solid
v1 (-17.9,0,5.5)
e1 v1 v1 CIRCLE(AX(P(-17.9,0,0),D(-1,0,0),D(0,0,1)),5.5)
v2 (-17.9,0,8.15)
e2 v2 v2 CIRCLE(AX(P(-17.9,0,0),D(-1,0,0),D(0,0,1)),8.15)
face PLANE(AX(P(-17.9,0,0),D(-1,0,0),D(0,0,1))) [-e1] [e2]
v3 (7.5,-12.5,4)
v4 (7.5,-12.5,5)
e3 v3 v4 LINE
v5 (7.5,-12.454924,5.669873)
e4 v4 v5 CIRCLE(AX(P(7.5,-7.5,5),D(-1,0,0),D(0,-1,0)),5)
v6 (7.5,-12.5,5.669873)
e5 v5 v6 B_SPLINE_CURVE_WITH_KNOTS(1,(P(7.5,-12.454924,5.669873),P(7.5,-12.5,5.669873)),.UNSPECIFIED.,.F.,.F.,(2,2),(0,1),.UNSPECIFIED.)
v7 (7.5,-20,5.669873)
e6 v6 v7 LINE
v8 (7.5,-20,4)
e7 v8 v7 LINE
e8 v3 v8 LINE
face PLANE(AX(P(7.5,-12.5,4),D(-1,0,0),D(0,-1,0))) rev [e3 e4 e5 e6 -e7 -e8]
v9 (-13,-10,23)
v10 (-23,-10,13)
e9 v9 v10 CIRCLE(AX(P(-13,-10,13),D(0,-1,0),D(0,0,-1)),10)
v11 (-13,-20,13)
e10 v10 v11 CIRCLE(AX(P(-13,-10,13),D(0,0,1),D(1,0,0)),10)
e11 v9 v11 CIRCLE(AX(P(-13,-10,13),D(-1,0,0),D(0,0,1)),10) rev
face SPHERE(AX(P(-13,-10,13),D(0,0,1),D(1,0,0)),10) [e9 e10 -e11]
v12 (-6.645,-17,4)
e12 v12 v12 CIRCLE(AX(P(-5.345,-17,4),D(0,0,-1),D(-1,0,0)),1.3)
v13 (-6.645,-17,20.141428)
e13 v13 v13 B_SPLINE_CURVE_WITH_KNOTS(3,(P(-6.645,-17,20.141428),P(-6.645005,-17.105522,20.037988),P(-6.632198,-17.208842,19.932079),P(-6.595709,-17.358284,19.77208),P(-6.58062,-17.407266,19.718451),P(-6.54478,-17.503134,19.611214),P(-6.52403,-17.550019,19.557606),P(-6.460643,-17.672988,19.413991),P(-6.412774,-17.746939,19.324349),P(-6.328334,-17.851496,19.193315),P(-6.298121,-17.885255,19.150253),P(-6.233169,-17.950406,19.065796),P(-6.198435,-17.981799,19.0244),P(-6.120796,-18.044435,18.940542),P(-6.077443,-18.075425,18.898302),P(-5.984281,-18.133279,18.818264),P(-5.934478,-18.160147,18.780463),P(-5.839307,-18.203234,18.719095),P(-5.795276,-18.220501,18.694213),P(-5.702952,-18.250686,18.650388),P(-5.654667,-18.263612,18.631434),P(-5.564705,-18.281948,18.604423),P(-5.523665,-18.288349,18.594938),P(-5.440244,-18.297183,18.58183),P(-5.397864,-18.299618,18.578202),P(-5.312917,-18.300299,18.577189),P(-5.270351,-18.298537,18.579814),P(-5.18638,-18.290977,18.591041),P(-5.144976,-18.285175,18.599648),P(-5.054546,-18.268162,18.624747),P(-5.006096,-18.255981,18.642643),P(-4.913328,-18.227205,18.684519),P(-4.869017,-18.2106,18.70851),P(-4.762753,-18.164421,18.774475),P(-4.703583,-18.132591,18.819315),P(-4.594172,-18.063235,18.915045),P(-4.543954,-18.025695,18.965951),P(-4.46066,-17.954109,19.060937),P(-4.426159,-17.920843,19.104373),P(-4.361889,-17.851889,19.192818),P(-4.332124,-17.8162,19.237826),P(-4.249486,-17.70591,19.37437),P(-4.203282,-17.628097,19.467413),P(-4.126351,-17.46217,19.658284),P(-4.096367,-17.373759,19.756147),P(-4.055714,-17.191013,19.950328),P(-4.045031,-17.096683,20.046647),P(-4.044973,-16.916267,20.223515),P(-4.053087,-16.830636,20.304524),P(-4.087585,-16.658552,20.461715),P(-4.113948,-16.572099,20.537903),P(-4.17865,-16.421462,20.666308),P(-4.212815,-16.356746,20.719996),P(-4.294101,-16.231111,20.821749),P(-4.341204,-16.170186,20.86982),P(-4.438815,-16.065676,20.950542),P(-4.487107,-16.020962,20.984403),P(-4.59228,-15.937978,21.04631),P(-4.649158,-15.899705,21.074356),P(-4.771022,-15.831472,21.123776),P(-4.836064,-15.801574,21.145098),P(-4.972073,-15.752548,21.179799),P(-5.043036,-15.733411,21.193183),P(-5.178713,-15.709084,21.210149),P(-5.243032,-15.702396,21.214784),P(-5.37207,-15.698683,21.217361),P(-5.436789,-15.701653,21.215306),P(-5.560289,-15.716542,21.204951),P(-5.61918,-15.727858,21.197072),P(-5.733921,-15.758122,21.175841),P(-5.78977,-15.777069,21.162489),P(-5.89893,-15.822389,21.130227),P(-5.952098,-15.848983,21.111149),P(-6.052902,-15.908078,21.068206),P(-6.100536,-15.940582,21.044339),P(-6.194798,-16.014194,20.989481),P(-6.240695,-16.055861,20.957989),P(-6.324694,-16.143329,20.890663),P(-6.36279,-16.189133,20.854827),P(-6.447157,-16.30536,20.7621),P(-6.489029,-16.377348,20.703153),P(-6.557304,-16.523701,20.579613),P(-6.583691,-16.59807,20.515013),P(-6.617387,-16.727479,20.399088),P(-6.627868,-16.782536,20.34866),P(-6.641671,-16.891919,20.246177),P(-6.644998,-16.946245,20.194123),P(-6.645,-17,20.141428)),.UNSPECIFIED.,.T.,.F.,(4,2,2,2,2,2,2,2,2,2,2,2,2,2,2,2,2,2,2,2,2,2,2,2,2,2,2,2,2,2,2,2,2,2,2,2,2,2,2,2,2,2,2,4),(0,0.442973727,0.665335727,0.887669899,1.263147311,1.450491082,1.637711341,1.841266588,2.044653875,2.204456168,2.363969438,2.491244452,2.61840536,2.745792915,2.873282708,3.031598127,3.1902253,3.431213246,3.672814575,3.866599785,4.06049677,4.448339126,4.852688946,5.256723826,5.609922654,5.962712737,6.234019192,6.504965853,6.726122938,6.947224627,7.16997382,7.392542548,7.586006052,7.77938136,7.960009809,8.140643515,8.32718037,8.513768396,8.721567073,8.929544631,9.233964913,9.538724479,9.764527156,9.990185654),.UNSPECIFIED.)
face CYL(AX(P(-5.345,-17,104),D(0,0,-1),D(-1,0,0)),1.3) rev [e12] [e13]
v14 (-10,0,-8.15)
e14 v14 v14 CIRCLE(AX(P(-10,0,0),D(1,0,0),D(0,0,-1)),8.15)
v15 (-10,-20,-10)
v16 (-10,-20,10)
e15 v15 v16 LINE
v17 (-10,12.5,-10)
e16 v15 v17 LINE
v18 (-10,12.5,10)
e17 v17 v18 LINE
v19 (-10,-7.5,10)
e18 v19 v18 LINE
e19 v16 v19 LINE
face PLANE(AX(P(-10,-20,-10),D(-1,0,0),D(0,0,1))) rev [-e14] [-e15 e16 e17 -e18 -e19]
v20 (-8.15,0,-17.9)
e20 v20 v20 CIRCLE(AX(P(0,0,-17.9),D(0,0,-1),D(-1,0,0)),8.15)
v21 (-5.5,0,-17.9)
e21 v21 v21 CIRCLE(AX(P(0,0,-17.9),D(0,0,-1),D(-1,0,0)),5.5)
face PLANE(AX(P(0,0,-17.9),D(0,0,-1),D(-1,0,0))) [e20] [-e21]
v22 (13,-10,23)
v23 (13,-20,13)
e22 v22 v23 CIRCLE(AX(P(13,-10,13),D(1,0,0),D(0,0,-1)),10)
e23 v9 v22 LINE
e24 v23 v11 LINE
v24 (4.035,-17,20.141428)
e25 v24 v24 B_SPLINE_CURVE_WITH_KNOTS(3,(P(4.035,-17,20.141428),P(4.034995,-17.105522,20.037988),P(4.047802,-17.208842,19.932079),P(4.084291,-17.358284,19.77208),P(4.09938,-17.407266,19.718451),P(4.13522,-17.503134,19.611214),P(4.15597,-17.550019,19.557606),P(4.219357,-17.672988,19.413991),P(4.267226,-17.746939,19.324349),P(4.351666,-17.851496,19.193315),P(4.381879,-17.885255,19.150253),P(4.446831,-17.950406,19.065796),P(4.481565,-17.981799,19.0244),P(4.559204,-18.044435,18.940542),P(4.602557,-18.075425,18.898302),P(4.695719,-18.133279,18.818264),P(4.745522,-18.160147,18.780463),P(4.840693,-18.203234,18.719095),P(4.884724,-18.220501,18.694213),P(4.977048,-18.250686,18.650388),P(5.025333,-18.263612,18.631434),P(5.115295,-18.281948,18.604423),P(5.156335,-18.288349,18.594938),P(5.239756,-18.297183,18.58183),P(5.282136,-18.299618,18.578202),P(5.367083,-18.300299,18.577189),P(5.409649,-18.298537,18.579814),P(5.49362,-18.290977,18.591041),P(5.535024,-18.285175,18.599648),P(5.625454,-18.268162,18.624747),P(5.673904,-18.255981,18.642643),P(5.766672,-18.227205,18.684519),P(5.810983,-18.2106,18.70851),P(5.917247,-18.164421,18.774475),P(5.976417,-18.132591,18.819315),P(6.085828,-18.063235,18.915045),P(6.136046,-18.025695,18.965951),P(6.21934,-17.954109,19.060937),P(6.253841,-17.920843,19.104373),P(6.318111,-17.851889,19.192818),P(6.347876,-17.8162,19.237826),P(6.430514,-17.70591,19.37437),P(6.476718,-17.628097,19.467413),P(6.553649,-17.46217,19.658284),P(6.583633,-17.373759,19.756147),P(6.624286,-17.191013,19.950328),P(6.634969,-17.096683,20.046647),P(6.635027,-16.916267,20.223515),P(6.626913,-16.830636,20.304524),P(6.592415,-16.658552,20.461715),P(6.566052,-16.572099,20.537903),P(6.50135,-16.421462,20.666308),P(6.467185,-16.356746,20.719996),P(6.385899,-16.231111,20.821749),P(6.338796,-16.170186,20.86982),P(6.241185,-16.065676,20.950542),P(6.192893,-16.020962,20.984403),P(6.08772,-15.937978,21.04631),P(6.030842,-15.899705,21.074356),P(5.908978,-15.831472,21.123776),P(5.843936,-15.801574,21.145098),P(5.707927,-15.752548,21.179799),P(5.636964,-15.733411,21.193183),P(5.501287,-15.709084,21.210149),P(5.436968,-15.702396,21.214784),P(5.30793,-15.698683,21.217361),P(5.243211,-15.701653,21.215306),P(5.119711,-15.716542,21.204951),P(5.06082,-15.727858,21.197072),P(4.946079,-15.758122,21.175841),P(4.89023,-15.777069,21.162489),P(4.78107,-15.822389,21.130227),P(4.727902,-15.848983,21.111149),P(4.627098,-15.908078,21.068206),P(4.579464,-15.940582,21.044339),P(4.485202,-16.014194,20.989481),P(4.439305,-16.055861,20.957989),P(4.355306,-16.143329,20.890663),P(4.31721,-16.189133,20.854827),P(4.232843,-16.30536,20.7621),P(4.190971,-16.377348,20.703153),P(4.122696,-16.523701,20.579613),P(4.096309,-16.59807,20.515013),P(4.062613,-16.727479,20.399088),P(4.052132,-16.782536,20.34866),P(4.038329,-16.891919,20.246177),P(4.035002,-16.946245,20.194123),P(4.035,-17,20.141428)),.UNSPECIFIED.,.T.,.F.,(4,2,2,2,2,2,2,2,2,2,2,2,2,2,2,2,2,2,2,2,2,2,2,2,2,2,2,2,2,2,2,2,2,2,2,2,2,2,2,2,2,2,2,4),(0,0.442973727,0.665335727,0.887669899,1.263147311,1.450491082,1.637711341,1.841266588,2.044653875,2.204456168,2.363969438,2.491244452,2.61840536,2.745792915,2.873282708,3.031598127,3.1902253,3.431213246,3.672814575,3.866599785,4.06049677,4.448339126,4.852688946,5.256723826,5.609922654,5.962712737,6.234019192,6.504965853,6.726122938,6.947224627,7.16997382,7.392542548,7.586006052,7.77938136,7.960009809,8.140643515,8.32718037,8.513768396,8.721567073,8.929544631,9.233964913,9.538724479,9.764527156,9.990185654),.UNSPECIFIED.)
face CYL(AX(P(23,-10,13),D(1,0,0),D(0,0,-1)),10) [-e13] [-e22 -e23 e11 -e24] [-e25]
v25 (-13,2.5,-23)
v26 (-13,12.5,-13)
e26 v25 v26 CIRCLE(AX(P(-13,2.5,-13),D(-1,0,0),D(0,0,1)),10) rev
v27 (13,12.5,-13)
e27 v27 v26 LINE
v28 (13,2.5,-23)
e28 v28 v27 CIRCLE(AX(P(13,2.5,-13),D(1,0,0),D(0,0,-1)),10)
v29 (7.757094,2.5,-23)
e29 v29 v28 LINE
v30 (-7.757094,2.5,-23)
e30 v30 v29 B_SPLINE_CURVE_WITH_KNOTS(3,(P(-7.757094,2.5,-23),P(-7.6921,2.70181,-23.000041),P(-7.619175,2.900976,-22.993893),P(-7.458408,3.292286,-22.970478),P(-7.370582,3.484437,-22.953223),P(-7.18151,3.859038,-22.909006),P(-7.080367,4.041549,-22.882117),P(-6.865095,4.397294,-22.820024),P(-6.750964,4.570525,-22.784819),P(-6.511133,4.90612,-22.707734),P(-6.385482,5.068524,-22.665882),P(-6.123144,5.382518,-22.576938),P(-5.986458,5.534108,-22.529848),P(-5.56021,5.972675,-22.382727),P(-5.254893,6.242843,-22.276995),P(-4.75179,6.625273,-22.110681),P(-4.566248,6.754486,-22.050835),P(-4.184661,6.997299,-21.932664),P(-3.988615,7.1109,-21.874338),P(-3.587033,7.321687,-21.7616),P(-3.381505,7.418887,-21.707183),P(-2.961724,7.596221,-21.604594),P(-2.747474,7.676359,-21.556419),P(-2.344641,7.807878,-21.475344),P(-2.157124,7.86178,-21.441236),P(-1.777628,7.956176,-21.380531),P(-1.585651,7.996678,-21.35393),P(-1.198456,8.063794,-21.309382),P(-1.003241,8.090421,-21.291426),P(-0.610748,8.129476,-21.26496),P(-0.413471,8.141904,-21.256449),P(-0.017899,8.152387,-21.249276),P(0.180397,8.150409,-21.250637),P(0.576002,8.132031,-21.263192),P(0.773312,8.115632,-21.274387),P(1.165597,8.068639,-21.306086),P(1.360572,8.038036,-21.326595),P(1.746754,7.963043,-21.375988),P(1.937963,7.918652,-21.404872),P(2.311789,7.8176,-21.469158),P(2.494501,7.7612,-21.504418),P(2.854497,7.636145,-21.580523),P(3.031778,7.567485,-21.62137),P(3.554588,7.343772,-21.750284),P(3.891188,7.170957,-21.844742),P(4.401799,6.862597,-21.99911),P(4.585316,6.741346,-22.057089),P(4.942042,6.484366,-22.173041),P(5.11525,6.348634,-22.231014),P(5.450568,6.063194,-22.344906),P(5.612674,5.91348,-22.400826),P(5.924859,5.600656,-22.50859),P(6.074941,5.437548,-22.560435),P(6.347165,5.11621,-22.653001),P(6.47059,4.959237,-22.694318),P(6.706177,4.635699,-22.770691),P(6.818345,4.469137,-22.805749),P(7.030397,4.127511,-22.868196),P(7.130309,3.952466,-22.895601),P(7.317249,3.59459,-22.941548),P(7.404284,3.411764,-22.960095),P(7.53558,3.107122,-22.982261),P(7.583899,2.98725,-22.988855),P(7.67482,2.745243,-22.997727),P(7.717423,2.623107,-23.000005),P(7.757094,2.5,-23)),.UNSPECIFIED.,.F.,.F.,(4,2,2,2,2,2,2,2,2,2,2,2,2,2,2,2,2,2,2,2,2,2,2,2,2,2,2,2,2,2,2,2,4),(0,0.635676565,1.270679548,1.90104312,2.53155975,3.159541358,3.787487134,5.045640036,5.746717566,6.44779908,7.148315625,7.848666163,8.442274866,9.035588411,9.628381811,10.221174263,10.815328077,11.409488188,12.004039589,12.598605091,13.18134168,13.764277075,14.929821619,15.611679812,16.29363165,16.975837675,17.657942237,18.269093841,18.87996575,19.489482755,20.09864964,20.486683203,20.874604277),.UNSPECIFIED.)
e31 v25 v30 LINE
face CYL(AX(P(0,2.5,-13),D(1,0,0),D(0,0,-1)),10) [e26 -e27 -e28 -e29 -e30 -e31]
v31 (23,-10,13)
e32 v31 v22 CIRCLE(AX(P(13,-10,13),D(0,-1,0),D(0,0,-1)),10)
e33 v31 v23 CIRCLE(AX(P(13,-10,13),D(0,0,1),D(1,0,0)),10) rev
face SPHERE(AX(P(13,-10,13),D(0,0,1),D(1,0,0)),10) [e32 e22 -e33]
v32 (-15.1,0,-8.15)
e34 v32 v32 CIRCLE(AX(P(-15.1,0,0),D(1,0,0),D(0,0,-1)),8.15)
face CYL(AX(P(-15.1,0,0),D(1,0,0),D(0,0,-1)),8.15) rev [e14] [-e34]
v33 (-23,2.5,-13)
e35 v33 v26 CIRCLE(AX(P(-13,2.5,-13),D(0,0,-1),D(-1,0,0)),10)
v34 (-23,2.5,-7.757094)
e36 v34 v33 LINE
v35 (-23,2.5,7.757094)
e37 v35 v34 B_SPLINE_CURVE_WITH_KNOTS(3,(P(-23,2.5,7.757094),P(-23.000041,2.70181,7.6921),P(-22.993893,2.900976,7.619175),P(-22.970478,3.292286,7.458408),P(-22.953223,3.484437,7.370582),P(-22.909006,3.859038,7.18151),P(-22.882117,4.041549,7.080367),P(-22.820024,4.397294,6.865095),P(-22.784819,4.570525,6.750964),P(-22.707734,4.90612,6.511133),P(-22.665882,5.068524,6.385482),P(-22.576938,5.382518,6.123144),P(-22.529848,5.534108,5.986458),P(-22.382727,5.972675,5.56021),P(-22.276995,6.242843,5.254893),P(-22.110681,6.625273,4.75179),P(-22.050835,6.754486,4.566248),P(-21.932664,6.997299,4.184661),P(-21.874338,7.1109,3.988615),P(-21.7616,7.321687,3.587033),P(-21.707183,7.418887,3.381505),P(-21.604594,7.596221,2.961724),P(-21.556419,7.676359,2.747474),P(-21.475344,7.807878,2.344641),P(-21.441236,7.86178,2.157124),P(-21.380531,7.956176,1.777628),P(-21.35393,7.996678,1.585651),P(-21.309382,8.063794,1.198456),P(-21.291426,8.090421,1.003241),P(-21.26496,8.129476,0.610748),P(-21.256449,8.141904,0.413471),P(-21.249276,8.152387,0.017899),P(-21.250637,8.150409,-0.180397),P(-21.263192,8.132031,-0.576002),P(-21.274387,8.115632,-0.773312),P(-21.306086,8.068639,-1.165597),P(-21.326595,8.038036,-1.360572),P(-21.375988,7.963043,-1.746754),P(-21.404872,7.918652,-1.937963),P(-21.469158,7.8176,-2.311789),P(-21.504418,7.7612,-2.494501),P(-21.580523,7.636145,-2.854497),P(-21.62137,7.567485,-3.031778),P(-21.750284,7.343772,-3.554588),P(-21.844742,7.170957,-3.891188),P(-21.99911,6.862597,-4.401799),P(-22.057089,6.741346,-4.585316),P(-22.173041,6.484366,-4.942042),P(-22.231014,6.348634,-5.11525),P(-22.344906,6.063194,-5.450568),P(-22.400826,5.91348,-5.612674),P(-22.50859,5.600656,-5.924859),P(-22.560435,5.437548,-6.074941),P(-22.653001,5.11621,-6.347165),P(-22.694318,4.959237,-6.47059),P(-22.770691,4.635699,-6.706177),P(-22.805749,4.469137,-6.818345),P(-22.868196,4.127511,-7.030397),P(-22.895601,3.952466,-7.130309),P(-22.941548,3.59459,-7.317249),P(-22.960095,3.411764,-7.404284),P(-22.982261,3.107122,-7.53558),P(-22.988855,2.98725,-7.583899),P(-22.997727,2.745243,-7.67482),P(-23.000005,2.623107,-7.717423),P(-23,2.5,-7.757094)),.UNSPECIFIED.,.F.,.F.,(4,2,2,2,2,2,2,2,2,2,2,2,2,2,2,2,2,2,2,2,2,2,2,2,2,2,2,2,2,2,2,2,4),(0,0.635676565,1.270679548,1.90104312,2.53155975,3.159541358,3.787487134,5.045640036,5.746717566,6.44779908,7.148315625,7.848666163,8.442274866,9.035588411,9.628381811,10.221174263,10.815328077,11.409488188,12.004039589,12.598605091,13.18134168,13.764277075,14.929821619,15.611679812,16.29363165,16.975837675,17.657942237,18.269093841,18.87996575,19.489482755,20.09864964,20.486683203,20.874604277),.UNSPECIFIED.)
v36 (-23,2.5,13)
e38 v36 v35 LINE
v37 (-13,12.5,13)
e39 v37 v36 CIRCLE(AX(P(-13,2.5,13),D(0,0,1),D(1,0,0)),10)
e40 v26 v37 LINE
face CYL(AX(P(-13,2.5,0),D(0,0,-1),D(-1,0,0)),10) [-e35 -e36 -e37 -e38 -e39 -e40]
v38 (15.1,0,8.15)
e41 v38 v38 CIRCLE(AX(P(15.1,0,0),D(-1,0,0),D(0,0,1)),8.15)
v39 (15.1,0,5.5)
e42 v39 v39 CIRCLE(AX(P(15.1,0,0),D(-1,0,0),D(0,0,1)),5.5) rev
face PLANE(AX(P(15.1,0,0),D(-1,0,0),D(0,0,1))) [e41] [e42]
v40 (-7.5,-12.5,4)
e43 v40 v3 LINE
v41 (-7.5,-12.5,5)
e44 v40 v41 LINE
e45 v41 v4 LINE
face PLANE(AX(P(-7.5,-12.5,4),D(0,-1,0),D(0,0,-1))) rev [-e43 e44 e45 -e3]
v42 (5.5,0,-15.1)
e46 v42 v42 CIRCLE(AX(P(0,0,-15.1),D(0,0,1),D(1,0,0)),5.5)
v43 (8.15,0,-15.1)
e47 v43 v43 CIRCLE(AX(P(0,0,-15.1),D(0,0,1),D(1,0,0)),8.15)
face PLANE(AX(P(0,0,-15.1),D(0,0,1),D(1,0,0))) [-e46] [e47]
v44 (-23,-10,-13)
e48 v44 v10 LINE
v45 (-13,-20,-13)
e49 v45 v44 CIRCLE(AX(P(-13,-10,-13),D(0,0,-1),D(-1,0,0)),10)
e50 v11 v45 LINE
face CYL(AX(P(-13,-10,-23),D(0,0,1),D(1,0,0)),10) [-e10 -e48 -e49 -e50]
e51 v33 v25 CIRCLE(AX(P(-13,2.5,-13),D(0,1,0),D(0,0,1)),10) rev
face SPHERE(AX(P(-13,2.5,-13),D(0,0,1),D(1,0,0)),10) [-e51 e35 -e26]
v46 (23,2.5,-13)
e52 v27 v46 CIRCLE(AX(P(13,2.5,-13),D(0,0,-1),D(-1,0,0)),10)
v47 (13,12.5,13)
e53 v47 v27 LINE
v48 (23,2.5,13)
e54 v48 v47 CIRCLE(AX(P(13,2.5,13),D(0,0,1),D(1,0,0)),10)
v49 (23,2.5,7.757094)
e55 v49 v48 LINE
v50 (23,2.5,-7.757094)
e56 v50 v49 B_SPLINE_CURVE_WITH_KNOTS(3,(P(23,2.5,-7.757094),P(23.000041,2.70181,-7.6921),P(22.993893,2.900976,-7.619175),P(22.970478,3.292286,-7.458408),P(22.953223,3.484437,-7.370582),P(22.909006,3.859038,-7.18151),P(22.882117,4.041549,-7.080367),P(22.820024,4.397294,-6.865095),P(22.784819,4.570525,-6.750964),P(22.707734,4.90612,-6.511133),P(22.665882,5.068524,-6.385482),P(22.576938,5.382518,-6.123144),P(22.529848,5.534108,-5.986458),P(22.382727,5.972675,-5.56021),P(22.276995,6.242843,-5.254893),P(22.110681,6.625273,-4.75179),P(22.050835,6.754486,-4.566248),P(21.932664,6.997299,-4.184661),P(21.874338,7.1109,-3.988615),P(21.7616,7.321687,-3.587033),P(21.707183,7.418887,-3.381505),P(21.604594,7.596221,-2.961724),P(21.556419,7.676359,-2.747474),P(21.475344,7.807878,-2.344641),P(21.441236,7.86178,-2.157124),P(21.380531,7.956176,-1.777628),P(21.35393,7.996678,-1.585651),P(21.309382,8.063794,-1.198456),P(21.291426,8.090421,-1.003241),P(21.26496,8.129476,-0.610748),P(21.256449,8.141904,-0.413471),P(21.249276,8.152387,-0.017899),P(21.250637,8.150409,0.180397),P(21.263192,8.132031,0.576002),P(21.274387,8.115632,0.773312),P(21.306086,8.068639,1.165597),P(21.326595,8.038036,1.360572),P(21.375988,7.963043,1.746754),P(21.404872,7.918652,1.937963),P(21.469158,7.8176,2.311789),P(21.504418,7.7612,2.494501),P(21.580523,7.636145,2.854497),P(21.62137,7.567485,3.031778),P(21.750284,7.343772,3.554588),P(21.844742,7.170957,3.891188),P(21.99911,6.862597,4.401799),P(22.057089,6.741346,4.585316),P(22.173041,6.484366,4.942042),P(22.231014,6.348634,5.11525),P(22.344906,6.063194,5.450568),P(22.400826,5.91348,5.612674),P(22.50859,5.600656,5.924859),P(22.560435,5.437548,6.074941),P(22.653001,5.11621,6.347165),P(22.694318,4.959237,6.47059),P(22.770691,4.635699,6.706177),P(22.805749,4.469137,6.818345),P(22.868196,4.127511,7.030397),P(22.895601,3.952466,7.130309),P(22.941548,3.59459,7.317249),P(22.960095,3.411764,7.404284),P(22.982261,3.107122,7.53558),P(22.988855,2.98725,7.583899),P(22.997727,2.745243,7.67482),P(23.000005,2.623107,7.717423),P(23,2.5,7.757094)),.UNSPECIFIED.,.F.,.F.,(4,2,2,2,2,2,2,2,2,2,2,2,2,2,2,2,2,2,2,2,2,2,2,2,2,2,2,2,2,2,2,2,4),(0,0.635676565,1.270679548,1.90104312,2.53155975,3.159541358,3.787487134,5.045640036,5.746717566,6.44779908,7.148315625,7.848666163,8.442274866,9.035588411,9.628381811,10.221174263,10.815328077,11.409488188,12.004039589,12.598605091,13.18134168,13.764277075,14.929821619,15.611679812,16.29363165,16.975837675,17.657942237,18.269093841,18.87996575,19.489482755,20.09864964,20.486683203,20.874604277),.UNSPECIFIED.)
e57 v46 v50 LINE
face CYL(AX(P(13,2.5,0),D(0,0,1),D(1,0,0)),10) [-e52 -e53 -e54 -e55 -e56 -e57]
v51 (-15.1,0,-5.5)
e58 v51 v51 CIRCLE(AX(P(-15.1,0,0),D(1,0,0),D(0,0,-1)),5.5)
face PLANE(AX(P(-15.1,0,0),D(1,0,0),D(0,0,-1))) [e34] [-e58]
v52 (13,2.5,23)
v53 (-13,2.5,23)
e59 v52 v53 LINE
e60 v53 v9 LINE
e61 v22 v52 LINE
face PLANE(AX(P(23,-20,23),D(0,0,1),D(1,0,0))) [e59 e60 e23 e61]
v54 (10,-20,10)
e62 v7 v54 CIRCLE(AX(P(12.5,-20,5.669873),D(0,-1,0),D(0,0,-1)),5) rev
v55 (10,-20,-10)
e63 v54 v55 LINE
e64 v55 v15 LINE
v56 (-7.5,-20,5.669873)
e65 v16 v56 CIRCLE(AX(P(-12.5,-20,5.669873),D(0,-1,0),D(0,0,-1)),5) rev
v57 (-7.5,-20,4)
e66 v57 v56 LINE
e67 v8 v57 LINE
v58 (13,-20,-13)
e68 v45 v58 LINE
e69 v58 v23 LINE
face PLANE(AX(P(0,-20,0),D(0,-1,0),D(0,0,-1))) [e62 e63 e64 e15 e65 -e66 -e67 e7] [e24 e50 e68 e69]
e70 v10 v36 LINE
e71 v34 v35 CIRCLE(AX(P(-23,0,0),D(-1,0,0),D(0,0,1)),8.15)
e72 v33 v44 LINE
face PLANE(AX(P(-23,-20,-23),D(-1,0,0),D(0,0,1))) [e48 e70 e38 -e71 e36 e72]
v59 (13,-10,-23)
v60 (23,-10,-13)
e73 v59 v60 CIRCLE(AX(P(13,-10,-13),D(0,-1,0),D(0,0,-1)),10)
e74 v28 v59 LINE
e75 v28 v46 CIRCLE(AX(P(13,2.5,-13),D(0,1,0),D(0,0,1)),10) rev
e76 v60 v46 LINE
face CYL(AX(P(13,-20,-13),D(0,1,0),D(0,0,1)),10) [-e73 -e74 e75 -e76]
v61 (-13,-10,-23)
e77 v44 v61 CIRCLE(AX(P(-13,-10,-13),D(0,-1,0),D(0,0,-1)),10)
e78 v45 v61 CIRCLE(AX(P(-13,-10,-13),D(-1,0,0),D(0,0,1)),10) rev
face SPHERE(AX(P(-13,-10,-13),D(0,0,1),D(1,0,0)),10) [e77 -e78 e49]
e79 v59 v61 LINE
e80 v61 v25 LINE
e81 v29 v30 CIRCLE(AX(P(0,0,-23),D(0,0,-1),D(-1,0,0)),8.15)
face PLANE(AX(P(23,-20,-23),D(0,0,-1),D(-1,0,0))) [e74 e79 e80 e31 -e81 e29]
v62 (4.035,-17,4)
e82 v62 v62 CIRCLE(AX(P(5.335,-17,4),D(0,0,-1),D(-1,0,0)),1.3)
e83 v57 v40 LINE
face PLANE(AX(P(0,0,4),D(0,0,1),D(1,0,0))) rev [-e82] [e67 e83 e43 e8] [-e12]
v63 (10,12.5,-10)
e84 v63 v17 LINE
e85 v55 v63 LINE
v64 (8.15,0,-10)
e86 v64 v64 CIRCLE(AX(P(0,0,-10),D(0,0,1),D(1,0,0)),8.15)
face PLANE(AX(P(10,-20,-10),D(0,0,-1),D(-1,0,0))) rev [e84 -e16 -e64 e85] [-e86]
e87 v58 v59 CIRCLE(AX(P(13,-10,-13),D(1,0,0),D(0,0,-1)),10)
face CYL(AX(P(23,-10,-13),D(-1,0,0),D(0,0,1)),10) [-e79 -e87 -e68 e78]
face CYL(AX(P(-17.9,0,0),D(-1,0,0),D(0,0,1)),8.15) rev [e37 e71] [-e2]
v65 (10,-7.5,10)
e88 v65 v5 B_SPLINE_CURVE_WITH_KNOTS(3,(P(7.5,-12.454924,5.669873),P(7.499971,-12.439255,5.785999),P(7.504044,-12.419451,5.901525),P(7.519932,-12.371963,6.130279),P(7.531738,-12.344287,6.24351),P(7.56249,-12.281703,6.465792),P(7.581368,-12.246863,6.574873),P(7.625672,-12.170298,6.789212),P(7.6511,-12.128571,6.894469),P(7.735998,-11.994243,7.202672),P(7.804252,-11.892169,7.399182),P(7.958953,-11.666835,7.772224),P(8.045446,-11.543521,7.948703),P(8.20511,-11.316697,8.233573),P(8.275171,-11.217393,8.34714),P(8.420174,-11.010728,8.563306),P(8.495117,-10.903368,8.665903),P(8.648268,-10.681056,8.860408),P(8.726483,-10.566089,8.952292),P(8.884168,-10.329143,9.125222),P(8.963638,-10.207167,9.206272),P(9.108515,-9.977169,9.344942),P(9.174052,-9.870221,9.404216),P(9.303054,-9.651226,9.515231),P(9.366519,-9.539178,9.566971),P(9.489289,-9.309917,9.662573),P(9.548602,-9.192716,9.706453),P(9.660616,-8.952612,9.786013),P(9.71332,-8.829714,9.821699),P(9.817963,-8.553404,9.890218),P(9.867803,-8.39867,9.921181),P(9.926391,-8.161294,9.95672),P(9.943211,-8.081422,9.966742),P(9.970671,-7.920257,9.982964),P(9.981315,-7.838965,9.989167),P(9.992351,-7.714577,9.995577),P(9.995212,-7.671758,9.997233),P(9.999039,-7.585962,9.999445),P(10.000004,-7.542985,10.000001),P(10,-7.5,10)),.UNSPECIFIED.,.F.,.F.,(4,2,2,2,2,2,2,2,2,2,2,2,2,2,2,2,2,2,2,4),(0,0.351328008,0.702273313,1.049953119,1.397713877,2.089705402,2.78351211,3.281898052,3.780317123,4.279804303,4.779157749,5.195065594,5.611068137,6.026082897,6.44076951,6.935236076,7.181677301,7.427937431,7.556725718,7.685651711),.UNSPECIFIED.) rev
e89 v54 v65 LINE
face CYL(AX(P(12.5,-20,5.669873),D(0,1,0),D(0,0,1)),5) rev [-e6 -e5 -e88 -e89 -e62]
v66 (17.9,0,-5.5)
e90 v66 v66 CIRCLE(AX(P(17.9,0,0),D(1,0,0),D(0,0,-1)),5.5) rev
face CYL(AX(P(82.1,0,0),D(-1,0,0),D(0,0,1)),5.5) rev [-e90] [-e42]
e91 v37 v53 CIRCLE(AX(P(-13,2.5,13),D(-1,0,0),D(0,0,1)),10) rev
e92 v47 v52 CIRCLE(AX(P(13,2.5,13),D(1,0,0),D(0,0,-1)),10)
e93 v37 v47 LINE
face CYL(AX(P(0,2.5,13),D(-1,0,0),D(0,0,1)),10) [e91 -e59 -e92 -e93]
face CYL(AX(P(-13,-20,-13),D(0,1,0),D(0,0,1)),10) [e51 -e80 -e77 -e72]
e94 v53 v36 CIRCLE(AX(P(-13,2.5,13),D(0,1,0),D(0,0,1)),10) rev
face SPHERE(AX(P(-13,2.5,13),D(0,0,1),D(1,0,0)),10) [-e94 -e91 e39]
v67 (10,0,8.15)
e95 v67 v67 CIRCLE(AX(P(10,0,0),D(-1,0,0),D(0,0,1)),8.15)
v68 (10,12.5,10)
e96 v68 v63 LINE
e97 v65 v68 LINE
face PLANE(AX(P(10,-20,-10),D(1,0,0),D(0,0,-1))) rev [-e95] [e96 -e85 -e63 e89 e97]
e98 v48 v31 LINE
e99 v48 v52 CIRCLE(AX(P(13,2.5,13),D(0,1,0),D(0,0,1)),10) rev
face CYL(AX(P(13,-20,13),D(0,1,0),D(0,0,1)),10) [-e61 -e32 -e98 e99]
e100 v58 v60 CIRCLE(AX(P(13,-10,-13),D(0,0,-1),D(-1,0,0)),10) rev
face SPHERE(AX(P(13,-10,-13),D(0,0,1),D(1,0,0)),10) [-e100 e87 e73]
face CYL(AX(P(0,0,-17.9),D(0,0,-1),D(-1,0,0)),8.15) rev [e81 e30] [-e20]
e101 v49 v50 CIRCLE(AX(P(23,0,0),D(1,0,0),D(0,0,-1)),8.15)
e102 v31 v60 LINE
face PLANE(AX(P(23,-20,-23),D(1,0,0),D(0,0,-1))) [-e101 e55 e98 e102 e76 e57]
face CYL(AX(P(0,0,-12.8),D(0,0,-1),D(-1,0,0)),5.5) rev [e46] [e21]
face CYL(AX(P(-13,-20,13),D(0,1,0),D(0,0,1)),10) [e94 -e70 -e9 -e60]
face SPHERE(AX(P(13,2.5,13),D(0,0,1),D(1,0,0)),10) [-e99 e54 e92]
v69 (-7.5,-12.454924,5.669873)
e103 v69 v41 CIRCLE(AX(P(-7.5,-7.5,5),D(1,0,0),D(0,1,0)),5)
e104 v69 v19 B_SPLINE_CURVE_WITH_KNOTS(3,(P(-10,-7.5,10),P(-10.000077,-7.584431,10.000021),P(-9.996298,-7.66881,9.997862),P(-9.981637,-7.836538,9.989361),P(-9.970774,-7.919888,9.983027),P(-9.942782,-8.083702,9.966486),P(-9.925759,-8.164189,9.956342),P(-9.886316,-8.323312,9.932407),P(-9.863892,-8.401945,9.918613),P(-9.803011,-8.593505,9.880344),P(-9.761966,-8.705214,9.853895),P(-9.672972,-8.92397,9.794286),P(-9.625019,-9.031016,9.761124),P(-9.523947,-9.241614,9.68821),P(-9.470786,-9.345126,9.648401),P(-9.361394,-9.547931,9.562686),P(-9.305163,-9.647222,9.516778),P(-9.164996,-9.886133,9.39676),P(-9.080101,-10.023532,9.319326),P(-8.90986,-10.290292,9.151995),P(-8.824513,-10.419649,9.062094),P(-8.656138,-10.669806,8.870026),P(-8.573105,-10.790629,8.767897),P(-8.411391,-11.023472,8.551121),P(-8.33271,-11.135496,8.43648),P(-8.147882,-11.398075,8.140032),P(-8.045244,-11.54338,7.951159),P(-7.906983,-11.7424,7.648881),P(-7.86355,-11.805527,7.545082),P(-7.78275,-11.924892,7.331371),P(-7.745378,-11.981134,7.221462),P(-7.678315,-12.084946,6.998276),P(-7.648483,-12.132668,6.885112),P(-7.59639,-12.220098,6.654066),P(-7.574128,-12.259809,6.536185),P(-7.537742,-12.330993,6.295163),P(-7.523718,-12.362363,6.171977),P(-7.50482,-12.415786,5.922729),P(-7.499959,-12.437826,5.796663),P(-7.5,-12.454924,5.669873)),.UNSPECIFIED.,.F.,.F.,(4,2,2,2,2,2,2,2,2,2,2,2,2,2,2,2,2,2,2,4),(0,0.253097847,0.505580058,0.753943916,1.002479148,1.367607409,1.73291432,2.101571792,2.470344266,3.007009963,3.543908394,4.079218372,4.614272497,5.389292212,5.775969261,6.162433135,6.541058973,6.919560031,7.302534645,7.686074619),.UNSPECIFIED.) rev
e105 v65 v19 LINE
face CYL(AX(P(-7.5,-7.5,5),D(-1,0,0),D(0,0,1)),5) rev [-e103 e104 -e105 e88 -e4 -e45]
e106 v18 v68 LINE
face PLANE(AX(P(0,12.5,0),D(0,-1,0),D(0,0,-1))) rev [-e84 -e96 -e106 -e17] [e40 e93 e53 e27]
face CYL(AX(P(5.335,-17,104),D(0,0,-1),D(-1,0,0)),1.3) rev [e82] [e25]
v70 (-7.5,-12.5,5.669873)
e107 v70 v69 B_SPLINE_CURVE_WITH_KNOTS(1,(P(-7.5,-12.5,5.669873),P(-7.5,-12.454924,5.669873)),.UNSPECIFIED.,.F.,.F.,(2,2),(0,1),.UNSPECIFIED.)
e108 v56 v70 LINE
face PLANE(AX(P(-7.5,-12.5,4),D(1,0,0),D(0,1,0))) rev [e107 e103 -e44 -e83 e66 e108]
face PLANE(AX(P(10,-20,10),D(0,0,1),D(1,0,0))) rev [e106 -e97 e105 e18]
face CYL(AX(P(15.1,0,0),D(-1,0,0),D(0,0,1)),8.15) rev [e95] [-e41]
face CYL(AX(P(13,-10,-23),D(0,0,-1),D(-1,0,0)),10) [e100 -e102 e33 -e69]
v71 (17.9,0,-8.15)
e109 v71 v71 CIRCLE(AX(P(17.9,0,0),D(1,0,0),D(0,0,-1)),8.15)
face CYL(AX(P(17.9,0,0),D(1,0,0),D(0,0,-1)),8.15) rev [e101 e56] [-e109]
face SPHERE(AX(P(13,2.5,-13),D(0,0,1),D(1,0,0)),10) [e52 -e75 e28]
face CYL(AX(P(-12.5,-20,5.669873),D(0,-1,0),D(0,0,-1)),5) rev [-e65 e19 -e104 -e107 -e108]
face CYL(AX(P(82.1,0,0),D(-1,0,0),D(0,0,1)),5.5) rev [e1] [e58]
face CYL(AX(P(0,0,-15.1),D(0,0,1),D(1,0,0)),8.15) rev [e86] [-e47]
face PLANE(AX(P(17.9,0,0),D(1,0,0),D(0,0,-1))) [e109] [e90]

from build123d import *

# Parameters (mm, degrees)
BOSS_EXTRUDE1_DEPTH      = 12.5
BOSS_EXTRUDE1_DEPTH_BACK = 20
SKETCH2_R                = 8.15
CUT_EXTRUDE1_DEPTH       = 5.1
CUT_EXTRUDE2_START       = -5.1
SKETCH3_R                = 8.15
CUT_EXTRUDE2_DEPTH       = 5.1
SKETCH4_R                = 5.5
CUT_EXTRUDE3_DEPTH       = 100
SKETCH5_R                = 8.150000000000011
CUT_EXTRUDE4_DEPTH       = 5.1
CUT_EXTRUDE5_START       = -5.1
SKETCH6_R                = 8.150000000000006
CUT_EXTRUDE5_DEPTH       = 5.1
SKETCH7_R                = 8.15
CUT_EXTRUDE6_DEPTH       = 5.1
CUT_EXTRUDE7_START       = -5.1
SKETCH8_R                = 8.150000000000004
CUT_EXTRUDE7_DEPTH       = 5.1
SKETCH9_R                = 5.5
CUT_EXTRUDE8_DEPTH       = 5.1
FILLET1_R                = 10
BOSS_EXTRUDE2_DEPTH      = 6
SKETCH10_R               = 1.2999999999999996
CUT_EXTRUDE9_DEPTH       = 100
FILLET2_R                = 5


with BuildPart() as part:
    # Sketch1 → Boss-Extrude1 (new, two sides: drawn at the far end of the back side and taken through both)
    with BuildSketch(Plane(origin=(0, 0, 0), x_dir=(1, 0, 0), z_dir=(0, 1, 0)).offset(-BOSS_EXTRUDE1_DEPTH_BACK)):
        Polygon((22.999999999999993, 23), (-22.999999999999993, 22.999999999999993), (-22.999999999999993, -23.000000000000007), (23.000000000000007, -23), align=None)
        Polygon((10, 9.999999999999998), (-10, 9.999999999999996), (-10, -10.000000000000004), (10.000000000000002, -10.000000000000002), align=None, mode=Mode.SUBTRACT)
    extrude(amount=BOSS_EXTRUDE1_DEPTH + BOSS_EXTRUDE1_DEPTH_BACK)

    # Sketch2 → Cut-Extrude1 (cut)
    with BuildSketch(Plane.ZY.offset(22.999999999999993)):
        Circle(SKETCH2_R)
    extrude(amount=-CUT_EXTRUDE1_DEPTH, mode=Mode.SUBTRACT)

    # Sketch3 → Cut-Extrude2 (cut)
    with BuildSketch(Plane(origin=(-10, 0, 0), x_dir=(0, 0, -1), z_dir=(1, 0, 0)).offset(CUT_EXTRUDE2_START)):
        with Locations(Location((1.73e-15, 0, 0), (0, 0, 180))):
            Circle(SKETCH3_R)
    extrude(amount=CUT_EXTRUDE2_DEPTH, mode=Mode.SUBTRACT)

    # Sketch4 → Cut-Extrude3 (cut)
    with BuildSketch(Plane.ZY.offset(17.89999999999999)):
        Circle(SKETCH4_R)
    extrude(amount=-CUT_EXTRUDE3_DEPTH, mode=Mode.SUBTRACT)

    # Sketch5 → Cut-Extrude4 (cut)
    with BuildSketch(Plane.ZY.offset(-10)):
        Circle(SKETCH5_R)
    extrude(amount=-CUT_EXTRUDE4_DEPTH, mode=Mode.SUBTRACT)

    # Sketch6 → Cut-Extrude5 (cut)
    with BuildSketch(Plane(origin=(23, 0, -6.94e-15), x_dir=(-3e-16, 0, -1), z_dir=(1, 0, -3e-16)).offset(CUT_EXTRUDE5_START)):
        with Locations(Location((0, 0, 0), (0, 0, 180))):
            Circle(SKETCH6_R)
    extrude(amount=CUT_EXTRUDE5_DEPTH, mode=Mode.SUBTRACT)

    # Sketch7 → Cut-Extrude6 (cut)
    with BuildSketch(Plane(origin=(-3.47e-15, 0, -22.999999999999996), x_dir=(-1, 0, 1.5e-16), z_dir=(-1.5e-16, 0, -1))):
        Circle(SKETCH7_R)
    extrude(amount=-CUT_EXTRUDE6_DEPTH, mode=Mode.SUBTRACT)

    # Sketch8 → Cut-Extrude7 (cut)
    with BuildSketch(Plane.XY.offset(-9.999999999999998).offset(CUT_EXTRUDE7_START)):
        with Locations(Location((8.7e-16, 0, 0), (0, 0, 180))):
            Circle(SKETCH8_R)
    extrude(amount=CUT_EXTRUDE7_DEPTH, mode=Mode.SUBTRACT)

    # Sketch9 → Cut-Extrude8 (cut)
    with BuildSketch(Plane(origin=(-2.7e-15, 0, -17.899999999999995), x_dir=(-1, 0, 1.5e-16), z_dir=(-1.5e-16, 0, -1))):
        Circle(SKETCH9_R)
    extrude(amount=-CUT_EXTRUDE8_DEPTH, mode=Mode.SUBTRACT)

    # Fillet1
    # the kernel refuses this fillet: 10 mm, written as the material it takes off along each edge
    with BuildSketch(Plane(origin=(13.000000000000004, -10, 13.000000000000002), x_dir=(0, -1, 0), z_dir=(1, 0, -3.1e-16))) as fillet1_piece_1_section:
        Polygon((0, 0), (FILLET1_R, 0), (FILLET1_R, -FILLET1_R), (0, -FILLET1_R), align=None)
    fillet1_piece_1 = extrude(amount=FILLET1_R, mode=Mode.PRIVATE)
    fillet1_piece_1 = fillet1_piece_1 - Plane(origin=(13.000000000000004, -10, 13.000000000000002), x_dir=(0, 0.7071067811865475, -0.7071067811865475), z_dir=(1, 0, -3.1e-16)) * Sphere(FILLET1_R, mode=Mode.PRIVATE)
    add(fillet1_piece_1, mode=Mode.SUBTRACT)
    with BuildSketch(Plane(origin=(12.999999999999996, -10, -13), x_dir=(1, 0, -3.1e-16), z_dir=(-1.5e-16, 0, -1))) as fillet1_piece_2_section:
        Polygon((0, 0), (FILLET1_R, 0), (FILLET1_R, FILLET1_R), (0, FILLET1_R), align=None)
    fillet1_piece_2 = extrude(amount=FILLET1_R, mode=Mode.PRIVATE)
    fillet1_piece_2 = fillet1_piece_2 - Plane(origin=(12.999999999999996, -10, -13), x_dir=(-0.7071067811865475, 0.7071067811865475, 0), z_dir=(-1.5e-16, 0, -1)) * Sphere(FILLET1_R, mode=Mode.PRIVATE)
    add(fillet1_piece_2, mode=Mode.SUBTRACT)
    with BuildSketch(Plane(origin=(-12.999999999999991, -10, -12.999999999999993), x_dir=(0, -1, 0), z_dir=(-1.5e-16, 0, -1))) as fillet1_piece_3_section:
        Polygon((0, 0), (FILLET1_R, 0), (FILLET1_R, FILLET1_R), (0, FILLET1_R), align=None)
    fillet1_piece_3 = extrude(amount=FILLET1_R, mode=Mode.PRIVATE)
    fillet1_piece_3 = fillet1_piece_3 - Plane(origin=(-12.999999999999991, -10, -12.999999999999993), x_dir=(0.7071067811865475, 0.7071067811865475, 0), z_dir=(-1.5e-16, 0, -1)) * Sphere(FILLET1_R, mode=Mode.PRIVATE)
    add(fillet1_piece_3, mode=Mode.SUBTRACT)
    with BuildSketch(Plane(origin=(-12.999999999999991, 2.5, -12.999999999999993), x_dir=(0, 1, 0), z_dir=(-1.5e-16, 0, -1))) as fillet1_piece_4_section:
        Polygon((0, 0), (FILLET1_R, 0), (FILLET1_R, -FILLET1_R), (0, -FILLET1_R), align=None)
    fillet1_piece_4 = extrude(amount=FILLET1_R, mode=Mode.PRIVATE)
    fillet1_piece_4 = fillet1_piece_4 - Plane(origin=(-12.999999999999991, 2.5, -12.999999999999993), x_dir=(0.7071067811865475, -0.7071067811865475, 0), z_dir=(-1.5e-16, 0, -1)) * Sphere(FILLET1_R, mode=Mode.PRIVATE)
    add(fillet1_piece_4, mode=Mode.SUBTRACT)
    with BuildSketch(Plane(origin=(-12.999999999999993, 2.5, 13.000000000000005), x_dir=(-1, 0, 0), z_dir=(0, 1, 0))) as fillet1_piece_5_section:
        Polygon((0, 0), (FILLET1_R, 0), (FILLET1_R, FILLET1_R), (-1.54e-15, FILLET1_R), align=None)
    fillet1_piece_5 = extrude(amount=FILLET1_R, mode=Mode.PRIVATE)
    fillet1_piece_5 = fillet1_piece_5 - Plane(origin=(-12.999999999999993, 2.5, 13.000000000000005), x_dir=(0.7071067811865475, 0, -0.7071067811865476), z_dir=(0, 1, 0)) * Sphere(FILLET1_R, mode=Mode.PRIVATE)
    add(fillet1_piece_5, mode=Mode.SUBTRACT)
    with BuildSketch(Plane(origin=(13.000000000000004, 2.5, 13.000000000000002), x_dir=(0, 1, 0), z_dir=(1, 0, -3.1e-16))) as fillet1_piece_6_section:
        Polygon((0, 0), (FILLET1_R, 0), (FILLET1_R, FILLET1_R), (0, FILLET1_R), align=None)
    fillet1_piece_6 = extrude(amount=FILLET1_R, mode=Mode.PRIVATE)
    fillet1_piece_6 = fillet1_piece_6 - Plane(origin=(13.000000000000004, 2.5, 13.000000000000002), x_dir=(0, -0.7071067811865475, -0.7071067811865475), z_dir=(1, 0, -3.1e-16)) * Sphere(FILLET1_R, mode=Mode.PRIVATE)
    add(fillet1_piece_6, mode=Mode.SUBTRACT)
    with BuildSketch(Plane(origin=(12.999999999999996, 2.5, -13), x_dir=(1, 0, -3.1e-16), z_dir=(-1.5e-16, 0, -1))) as fillet1_piece_7_section:
        Polygon((0, 0), (FILLET1_R, 0), (FILLET1_R, -FILLET1_R), (0, -FILLET1_R), align=None)
    fillet1_piece_7 = extrude(amount=FILLET1_R, mode=Mode.PRIVATE)
    fillet1_piece_7 = fillet1_piece_7 - Plane(origin=(12.999999999999996, 2.5, -13), x_dir=(-0.7071067811865475, -0.7071067811865475, 0), z_dir=(-1.5e-16, 0, -1)) * Sphere(FILLET1_R, mode=Mode.PRIVATE)
    add(fillet1_piece_7, mode=Mode.SUBTRACT)
    with BuildSketch(Plane(origin=(-12.999999999999993, -10, 13.000000000000005), x_dir=(-1, 0, 0), z_dir=(0, -1, 0))) as fillet1_piece_8_section:
        Polygon((0, 0), (FILLET1_R, 0), (FILLET1_R, -FILLET1_R), (-1.54e-15, -FILLET1_R), align=None)
    fillet1_piece_8 = extrude(amount=FILLET1_R, mode=Mode.PRIVATE)
    fillet1_piece_8 = fillet1_piece_8 - Plane(origin=(-12.999999999999993, -10, 13.000000000000005), x_dir=(0.7071067811865475, 0, -0.7071067811865476), z_dir=(0, -1, 0)) * Sphere(FILLET1_R, mode=Mode.PRIVATE)
    add(fillet1_piece_8, mode=Mode.SUBTRACT)
    with BuildSketch(Plane(origin=(23.000000000000004, -20, 12.999999999999998), x_dir=(0, 1, 0), z_dir=(-3.1e-16, 0, -1))) as fillet1_piece_9:
        with BuildLine():
            CenterArc((FILLET1_R, -FILLET1_R), FILLET1_R, 90, 90)
            Line((0, -FILLET1_R), (0, 0))
            Line((0, 0), (FILLET1_R, 0))
        make_face()
    extrude(amount=26.000000000000007, mode=Mode.SUBTRACT)
    with BuildSketch(Plane(origin=(12.999999999999996, -20, -23), x_dir=(0, 1, 0), z_dir=(-1, 0, 1.5e-16))) as fillet1_piece_10:
        with BuildLine():
            CenterArc((FILLET1_R, -FILLET1_R), FILLET1_R, 90, 90)
            Line((0, -FILLET1_R), (0, 0))
            Line((0, 0), (FILLET1_R, 0))
        make_face()
    extrude(amount=25.99999999999999, mode=Mode.SUBTRACT)
    with BuildSketch(Plane(origin=(-22.999999999999993, 12.5, -12.999999999999993), x_dir=(1, 0, 0), z_dir=(0, 0, 1)), Plane(origin=(-12.999999999999993, 12.5, 23.000000000000007), x_dir=(-1.5e-16, 0, -1), z_dir=(1, 0, -1.5e-16))) as fillet1_piece_11:
        with BuildLine():
            CenterArc((FILLET1_R, -FILLET1_R), FILLET1_R, 90, 90)
            Line((0, -FILLET1_R), (0, 0))
            Line((0, 0), (FILLET1_R, 0))
        make_face()
    extrude(amount=26, mode=Mode.SUBTRACT)
    with BuildSketch(Plane(origin=(23.000000000000004, 12.5, 12.999999999999998), x_dir=(0, -1, 0), z_dir=(-3.1e-16, 0, -1))) as fillet1_piece_12:
        with BuildLine():
            CenterArc((FILLET1_R, FILLET1_R), FILLET1_R, 180, 90)
            Line((-1.78e-15, FILLET1_R), (0, 0))
            Line((0, 0), (FILLET1_R, 0))
        make_face()
    extrude(amount=26.000000000000007, mode=Mode.SUBTRACT)
    with BuildSketch(Plane(origin=(12.999999999999996, 12.5, -23), x_dir=(0, -1, 0), z_dir=(-1, 0, 1.5e-16))) as fillet1_piece_13:
        with BuildLine():
            CenterArc((FILLET1_R, FILLET1_R), FILLET1_R, 180, 90)
            Line((-1.78e-15, FILLET1_R), (0, 0))
            Line((0, 0), (FILLET1_R, 0))
        make_face()
    extrude(amount=25.99999999999999, mode=Mode.SUBTRACT)
    with BuildSketch(Plane(origin=(-22.999999999999993, -20, -12.999999999999993), x_dir=(1, 0, 0), z_dir=(0, 0, 1)), Plane(origin=(-12.999999999999993, -20, 23.000000000000007), x_dir=(-1.5e-16, 0, -1), z_dir=(1, 0, -1.5e-16))) as fillet1_piece_14:
        with BuildLine():
            CenterArc((FILLET1_R, FILLET1_R), FILLET1_R, 180, 90)
            Line((0, FILLET1_R), (0, 0))
            Line((0, 0), (FILLET1_R, 0))
        make_face()
    extrude(amount=26, mode=Mode.SUBTRACT)
    with BuildSketch(Plane(origin=(-22.999999999999993, -10, -22.999999999999993), x_dir=(1, 0, 0), z_dir=(0, 1, 0))) as fillet1_piece_15:
        with BuildLine():
            CenterArc((FILLET1_R, -FILLET1_R), FILLET1_R, 90.00000000000001, 89.99999999999999)
            Line((0, -FILLET1_R), (0, 0))
            Line((0, 0), (FILLET1_R, 0))
        make_face()
    extrude(amount=12.5, mode=Mode.SUBTRACT)
    with BuildSketch(Plane(origin=(22.999999999999993, 2.5, -23), x_dir=(-1, 0, 0), z_dir=(0, -1, 0))) as fillet1_piece_16:
        with BuildLine():
            CenterArc((FILLET1_R, -FILLET1_R), FILLET1_R, 89.99999999999999, 90.00000000000001)
            Line((-3.55e-15, -FILLET1_R), (0, 0))
            Line((0, 0), (FILLET1_R, 0))
        make_face()
    extrude(amount=12.5, mode=Mode.SUBTRACT)
    with BuildSketch(Plane(origin=(23.000000000000007, 2.5, 23), x_dir=(-3.6e-16, 0, -1), z_dir=(0, -1, 0))) as fillet1_piece_17:
        with BuildLine():
            CenterArc((FILLET1_R, -FILLET1_R), FILLET1_R, 90, 90)
            Line((3.55e-15, -FILLET1_R), (0, 0))
            Line((0, 0), (FILLET1_R, 0))
        make_face()
    extrude(amount=12.5, mode=Mode.SUBTRACT)
    with BuildSketch(Plane(origin=(-22.999999999999993, -10, 23.000000000000007), x_dir=(0, 0, -1), z_dir=(0, 1, 0))) as fillet1_piece_18:
        with BuildLine():
            CenterArc((FILLET1_R, -FILLET1_R), FILLET1_R, 90, 90)
            Line((0, -FILLET1_R), (0, 0))
            Line((0, 0), (FILLET1_R, 0))
        make_face()
    extrude(amount=12.5, mode=Mode.SUBTRACT)

    # Sketch11 → Boss-Extrude2 (add)
    with BuildSketch(Plane(origin=(8.7e-16, 0, 10.000000000000002), x_dir=(-1, 0, 9e-17), z_dir=(-9e-17, 0, -1))):
        Polygon((7.500000000000003, -12.500000000000002), (-7.499999999999997, -12.500000000000002), (-7.4999999999999964, -20.000000000000004), (7.500000000000002, -20), align=None)
    extrude(amount=BOSS_EXTRUDE2_DEPTH)

    # Sketch10 → Cut-Extrude9 (cut)
    with BuildSketch(Plane(origin=(0, 0, 4.000000000000002), x_dir=(-1, 0, 0), z_dir=(0, 0, -1))):
        with Locations((5.345, -17)):
            Circle(SKETCH10_R)
        with Locations((-5.335, -17.000000000000004)):
            Circle(SKETCH10_R)
    extrude(amount=-CUT_EXTRUDE9_DEPTH, mode=Mode.SUBTRACT)

    # Fillet2
    # the kernel refuses this fillet: 5 mm, written as the material it adds along each edge
    with BuildSketch(Plane(origin=(-7.500000000000002, -12.500000000000002, 10.000000000000002), x_dir=(0, 1, 3.6e-16), z_dir=(1, 0, -9e-17))) as fillet2_piece_1:
        with BuildLine():
            CenterArc((FILLET2_R, -FILLET2_R), FILLET2_R, 89.99999999999999, 90.00000000000001)
            Line((-3.55e-15, -FILLET2_R), (-FILLET2_R * 0.02, -FILLET2_R))
            Line((-FILLET2_R * 0.02, -FILLET2_R), (-FILLET2_R * 0.02, FILLET2_R * 0.02))
            Line((-FILLET2_R * 0.02, FILLET2_R * 0.02), (FILLET2_R, FILLET2_R * 0.02))
            Line((FILLET2_R, FILLET2_R * 0.02), (FILLET2_R, 0))
        make_face()
    extrude(amount=15)
    with BuildSketch(Plane(origin=(-7.500000000000001, -20, 10.000000000000002), x_dir=(-1, -1.2e-16, -7.176e-14), z_dir=(-1.2e-16, 1, 0))) as fillet2_piece_2:
        with BuildLine():
            CenterArc((5.00000000000031, -4.3301270189220755), FILLET2_R, 120.00000000000271, 60.000000000001364)
            Line((3.0986e-13, -4.330127018922434), (-0.09999999999968978, -4.3301270189224415))
            Line((-0.09999999999968978, -4.3301270189224415), (-0.09999999999999964, -7.18e-15))
            Line((-0.09999999999999964, -7.18e-15), (-7.18e-15, 0.09999999999999964))
            ThreePointArc((-7.18e-15, 0.09999999999999964), (1.2500000000000435, 0.10000000000009113), (2.4500000000001005, 0.08660254037844158))
            Line((2.4500000000001005, 0.08660254037844158), (2.500000000000104, 0))
        make_face()
    extrude(amount=7.499999999999998)
    with BuildSketch(Plane(origin=(7.499999999999998, -12.500000000000002, 10.000000000000002), x_dir=(1, -1.2e-16, -7.248e-14), z_dir=(-1.2e-16, -1, 0))) as fillet2_piece_3:
        with BuildLine():
            CenterArc((5.0000000000003135, -4.3301270189220755), FILLET2_R, 120.00000000000271, 60.00000000000142)
            Line((3.1383e-13, -4.330127018922438), (-0.09999999999968581, -4.330127018922445))
            Line((-0.09999999999968581, -4.330127018922445), (-0.09999999999999964, -7.25e-15))
            Line((-0.09999999999999964, -7.25e-15), (-7.25e-15, 0.09999999999999964))
            ThreePointArc((-7.25e-15, 0.09999999999999964), (1.2500000000000513, 0.10000000000009024), (2.450000000000105, 0.08660254037844155))
            Line((2.450000000000105, 0.08660254037844155), (2.5000000000001084, 0))
        make_face()
    extrude(amount=7.500000000000002)
    with BuildSketch(Plane(origin=(-7.500000000000001, -20, 10.000000000000002), x_dir=(-1, -1.2e-16, -7.176e-14), z_dir=(-1.2e-16, 1, 0))) as fillet2_piece_4a_section:
        with BuildLine():
            CenterArc((5.00000000000031, -4.3301270189220755), FILLET2_R, 120.00000000000271, 60.000000000001364)
            Line((3.0986e-13, -4.330127018922434), (-0.09999999999968978, -4.3301270189224415))
            Line((-0.09999999999968978, -4.3301270189224415), (-0.09999999999999964, -7.18e-15))
            Line((-0.09999999999999964, -7.18e-15), (-7.18e-15, 0.09999999999999964))
            ThreePointArc((-7.18e-15, 0.09999999999999964), (1.2500000000000435, 0.10000000000009113), (2.4500000000001005, 0.08660254037844158))
            Line((2.4500000000001005, 0.08660254037844158), (2.500000000000104, 0))
        make_face()
    fillet2_piece_4a = extrude(amount=18.325317547306078, mode=Mode.PRIVATE)
    fillet2_piece_4a = split(fillet2_piece_4a, bisect_by=Plane(origin=(-8.14758355532625, -12.500000000000002, 8.918447770804566), z_dir=(0, 1, 0)), keep=Keep.TOP, mode=Mode.PRIVATE)
    with BuildSketch(Plane(origin=(-20.000000000000004, -12.500000000000002, 10.000000000000005), x_dir=(0, 1, 0), z_dir=(1, 0, -9e-17))) as fillet2_piece_4b_section:
        with BuildLine():
            CenterArc((FILLET2_R, -FILLET2_R), FILLET2_R, 90, 90)
            Line((-1.78e-15, -FILLET2_R), (-FILLET2_R * 0.02, -FILLET2_R))
            Line((-FILLET2_R * 0.02, -FILLET2_R), (-FILLET2_R * 0.02, FILLET2_R * 0.02))
            Line((-FILLET2_R * 0.02, FILLET2_R * 0.02), (FILLET2_R, FILLET2_R * 0.02))
            Line((FILLET2_R, FILLET2_R * 0.02), (FILLET2_R, 0))
        make_face()
    fillet2_piece_4b = extrude(amount=27.5, mode=Mode.PRIVATE)
    fillet2_piece_4b = split(fillet2_piece_4b, bisect_by=Plane(origin=(-7.500000000000002, -11.368024428665873, 8.868024428665876), z_dir=(-1, -1.2e-16, 9e-17)), keep=Keep.TOP, mode=Mode.PRIVATE)
    fillet2_piece_4 = fillet2_piece_4a & fillet2_piece_4b
    add(fillet2_piece_4)
    with BuildSketch(Plane(origin=(-7.500000000000002, -12.500000000000002, 10.000000000000002), x_dir=(0, 1, 3.6e-16), z_dir=(1, 0, -9e-17))) as fillet2_piece_5a_section:
        with BuildLine():
            CenterArc((FILLET2_R, -FILLET2_R), FILLET2_R, 89.99999999999999, 90.00000000000001)
            Line((-3.55e-15, -FILLET2_R), (-FILLET2_R * 0.02, -FILLET2_R))
            Line((-FILLET2_R * 0.02, -FILLET2_R), (-FILLET2_R * 0.02, FILLET2_R * 0.02))
            Line((-FILLET2_R * 0.02, FILLET2_R * 0.02), (FILLET2_R, FILLET2_R * 0.02))
            Line((FILLET2_R, FILLET2_R * 0.02), (FILLET2_R, 0))
        make_face()
    fillet2_piece_5a = extrude(amount=27.5, mode=Mode.PRIVATE)
    fillet2_piece_5a = split(fillet2_piece_5a, bisect_by=Plane(origin=(7.499999999999998, -11.368024428665873, 8.868024428665878), z_dir=(1, -1.2e-16, -9e-17)), keep=Keep.TOP, mode=Mode.PRIVATE)
    with BuildSketch(Plane(origin=(7.5, -1.674682452693899, 10.000000000000002), x_dir=(1, -1.2e-16, -7.319e-14), z_dir=(-1.2e-16, -1, 0))) as fillet2_piece_5b_section:
        with BuildLine():
            CenterArc((5.000000000000317, -4.330127018922071), FILLET2_R, 120.00000000000279, 60.00000000000142)
            Line((3.169e-13, -4.330127018922437), (-0.09999999999968275, -4.330127018922444))
            Line((-0.09999999999968275, -4.330127018922444), (-0.09999999999999964, -7.32e-15))
            Line((-0.09999999999999964, -7.32e-15), (-7.32e-15, 0.09999999999999964))
            ThreePointArc((-7.32e-15, 0.09999999999999964), (1.2500000000000495, 0.10000000000009113), (2.450000000000103, 0.0866025403784415))
            Line((2.450000000000103, 0.0866025403784415), (2.5000000000001066, 0))
        make_face()
    fillet2_piece_5b = extrude(amount=18.325317547306106, mode=Mode.PRIVATE)
    fillet2_piece_5b = split(fillet2_piece_5b, bisect_by=Plane(origin=(8.147583555326294, -12.500000000000002, 8.91844777080445), z_dir=(0, 1, 0)), keep=Keep.TOP, mode=Mode.PRIVATE)
    fillet2_piece_5 = fillet2_piece_5a & fillet2_piece_5b
    add(fillet2_piece_5)


solid = part.part
